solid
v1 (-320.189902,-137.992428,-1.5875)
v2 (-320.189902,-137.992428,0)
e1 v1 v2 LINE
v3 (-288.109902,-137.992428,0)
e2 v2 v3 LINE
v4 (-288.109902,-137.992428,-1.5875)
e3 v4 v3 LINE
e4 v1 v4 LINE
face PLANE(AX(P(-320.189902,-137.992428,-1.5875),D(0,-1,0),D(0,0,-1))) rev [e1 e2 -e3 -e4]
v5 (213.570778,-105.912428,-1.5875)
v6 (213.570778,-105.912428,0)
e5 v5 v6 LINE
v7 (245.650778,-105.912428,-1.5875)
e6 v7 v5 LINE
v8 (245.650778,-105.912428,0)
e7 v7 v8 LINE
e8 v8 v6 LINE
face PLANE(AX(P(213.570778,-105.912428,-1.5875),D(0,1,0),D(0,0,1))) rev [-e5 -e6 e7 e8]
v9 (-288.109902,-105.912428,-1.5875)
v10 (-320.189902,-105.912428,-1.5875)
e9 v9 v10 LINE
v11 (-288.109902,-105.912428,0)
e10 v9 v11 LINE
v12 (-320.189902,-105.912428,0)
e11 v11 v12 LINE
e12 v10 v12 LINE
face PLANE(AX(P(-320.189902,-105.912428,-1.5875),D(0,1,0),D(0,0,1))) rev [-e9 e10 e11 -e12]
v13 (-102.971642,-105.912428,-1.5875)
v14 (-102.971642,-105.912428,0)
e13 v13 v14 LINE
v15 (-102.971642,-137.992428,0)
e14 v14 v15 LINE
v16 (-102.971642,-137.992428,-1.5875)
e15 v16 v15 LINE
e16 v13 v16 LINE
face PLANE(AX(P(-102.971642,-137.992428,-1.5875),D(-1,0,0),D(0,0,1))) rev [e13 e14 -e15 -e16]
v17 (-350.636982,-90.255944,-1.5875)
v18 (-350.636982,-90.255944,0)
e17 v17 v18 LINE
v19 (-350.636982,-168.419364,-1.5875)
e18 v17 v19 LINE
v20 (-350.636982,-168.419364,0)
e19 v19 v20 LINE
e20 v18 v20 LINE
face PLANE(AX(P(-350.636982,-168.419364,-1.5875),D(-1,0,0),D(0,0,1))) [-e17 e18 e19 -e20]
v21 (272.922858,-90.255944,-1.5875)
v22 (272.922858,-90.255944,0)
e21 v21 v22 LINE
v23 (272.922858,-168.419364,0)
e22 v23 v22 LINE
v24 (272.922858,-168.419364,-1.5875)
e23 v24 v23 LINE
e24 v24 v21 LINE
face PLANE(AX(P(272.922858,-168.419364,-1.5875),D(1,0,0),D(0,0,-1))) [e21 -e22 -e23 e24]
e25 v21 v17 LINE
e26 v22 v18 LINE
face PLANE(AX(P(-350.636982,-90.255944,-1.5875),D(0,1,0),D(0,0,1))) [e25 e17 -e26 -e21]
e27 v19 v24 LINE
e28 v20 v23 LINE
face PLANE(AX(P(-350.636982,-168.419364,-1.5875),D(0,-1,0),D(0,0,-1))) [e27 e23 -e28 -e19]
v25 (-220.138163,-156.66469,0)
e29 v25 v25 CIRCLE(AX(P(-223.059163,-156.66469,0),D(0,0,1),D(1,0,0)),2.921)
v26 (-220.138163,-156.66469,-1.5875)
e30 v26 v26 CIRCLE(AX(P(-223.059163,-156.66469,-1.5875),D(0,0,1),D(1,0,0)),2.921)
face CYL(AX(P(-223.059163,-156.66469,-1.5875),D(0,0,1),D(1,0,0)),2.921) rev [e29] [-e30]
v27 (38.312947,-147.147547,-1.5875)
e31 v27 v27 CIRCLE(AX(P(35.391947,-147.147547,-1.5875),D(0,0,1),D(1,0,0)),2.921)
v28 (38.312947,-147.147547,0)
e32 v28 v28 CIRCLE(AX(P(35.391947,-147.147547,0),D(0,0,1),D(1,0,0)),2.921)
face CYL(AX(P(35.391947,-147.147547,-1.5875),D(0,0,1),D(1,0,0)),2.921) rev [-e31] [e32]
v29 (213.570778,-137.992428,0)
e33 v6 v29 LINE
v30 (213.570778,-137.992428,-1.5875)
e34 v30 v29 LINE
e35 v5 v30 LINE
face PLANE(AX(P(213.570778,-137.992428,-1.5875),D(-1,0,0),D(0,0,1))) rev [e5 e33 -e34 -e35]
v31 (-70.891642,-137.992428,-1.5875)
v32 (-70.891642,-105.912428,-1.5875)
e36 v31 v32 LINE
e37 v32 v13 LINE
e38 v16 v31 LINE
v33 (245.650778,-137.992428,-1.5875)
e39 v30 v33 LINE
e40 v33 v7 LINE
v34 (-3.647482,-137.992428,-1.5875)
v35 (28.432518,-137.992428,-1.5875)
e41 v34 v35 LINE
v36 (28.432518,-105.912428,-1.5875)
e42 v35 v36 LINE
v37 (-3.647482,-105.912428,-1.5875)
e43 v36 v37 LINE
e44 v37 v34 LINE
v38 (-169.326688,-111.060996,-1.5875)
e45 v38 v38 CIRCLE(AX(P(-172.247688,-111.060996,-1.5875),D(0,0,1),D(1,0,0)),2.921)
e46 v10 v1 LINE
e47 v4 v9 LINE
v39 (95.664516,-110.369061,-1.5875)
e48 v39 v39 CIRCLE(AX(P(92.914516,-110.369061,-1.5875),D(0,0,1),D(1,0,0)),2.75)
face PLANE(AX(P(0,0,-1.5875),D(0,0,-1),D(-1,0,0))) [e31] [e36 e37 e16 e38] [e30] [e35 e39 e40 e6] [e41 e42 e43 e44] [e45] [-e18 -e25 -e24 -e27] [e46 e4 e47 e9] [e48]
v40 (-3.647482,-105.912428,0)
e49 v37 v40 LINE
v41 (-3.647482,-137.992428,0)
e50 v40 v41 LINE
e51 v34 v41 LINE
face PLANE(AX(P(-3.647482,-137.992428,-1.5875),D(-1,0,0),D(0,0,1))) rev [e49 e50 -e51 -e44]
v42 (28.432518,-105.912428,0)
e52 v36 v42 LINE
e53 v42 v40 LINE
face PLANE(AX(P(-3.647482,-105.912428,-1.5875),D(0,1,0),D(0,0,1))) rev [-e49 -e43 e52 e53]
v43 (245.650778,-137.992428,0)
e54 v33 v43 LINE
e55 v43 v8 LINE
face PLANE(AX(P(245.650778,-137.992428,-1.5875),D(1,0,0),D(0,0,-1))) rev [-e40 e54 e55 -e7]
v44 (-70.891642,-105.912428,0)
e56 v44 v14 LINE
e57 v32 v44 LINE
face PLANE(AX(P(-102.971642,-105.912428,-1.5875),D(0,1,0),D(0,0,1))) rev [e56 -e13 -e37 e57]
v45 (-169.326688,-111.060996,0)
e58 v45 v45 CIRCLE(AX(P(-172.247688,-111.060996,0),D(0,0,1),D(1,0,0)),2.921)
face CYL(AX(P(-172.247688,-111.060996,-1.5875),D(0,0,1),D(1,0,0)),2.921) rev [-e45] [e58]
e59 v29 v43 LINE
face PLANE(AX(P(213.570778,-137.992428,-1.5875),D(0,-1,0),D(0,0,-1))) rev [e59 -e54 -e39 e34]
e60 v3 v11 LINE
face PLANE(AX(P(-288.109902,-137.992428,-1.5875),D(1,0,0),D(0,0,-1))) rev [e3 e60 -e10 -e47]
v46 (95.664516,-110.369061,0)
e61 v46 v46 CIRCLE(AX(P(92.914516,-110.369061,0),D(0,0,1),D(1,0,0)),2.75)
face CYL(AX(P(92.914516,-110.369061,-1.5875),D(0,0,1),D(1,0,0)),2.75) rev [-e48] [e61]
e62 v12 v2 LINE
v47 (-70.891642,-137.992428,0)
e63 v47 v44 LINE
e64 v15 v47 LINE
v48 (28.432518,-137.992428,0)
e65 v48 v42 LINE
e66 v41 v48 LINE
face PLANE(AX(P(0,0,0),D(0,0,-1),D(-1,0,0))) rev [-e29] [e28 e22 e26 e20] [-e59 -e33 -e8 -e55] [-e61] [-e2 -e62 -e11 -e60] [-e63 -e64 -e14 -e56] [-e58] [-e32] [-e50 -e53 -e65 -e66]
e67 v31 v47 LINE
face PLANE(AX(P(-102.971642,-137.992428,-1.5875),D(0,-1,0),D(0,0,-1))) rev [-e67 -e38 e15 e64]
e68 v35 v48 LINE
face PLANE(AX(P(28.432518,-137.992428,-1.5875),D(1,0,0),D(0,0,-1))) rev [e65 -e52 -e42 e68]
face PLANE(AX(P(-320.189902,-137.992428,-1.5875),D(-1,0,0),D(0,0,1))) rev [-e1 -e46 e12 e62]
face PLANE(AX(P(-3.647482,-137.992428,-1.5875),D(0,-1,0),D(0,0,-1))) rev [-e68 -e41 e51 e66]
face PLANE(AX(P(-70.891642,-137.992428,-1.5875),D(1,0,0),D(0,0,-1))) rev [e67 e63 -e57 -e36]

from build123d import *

# Parameters (mm, degrees)
SKETCH1_W          = 623.55984
SKETCH1_H          = 78.16342
BASE_FLANGE1_DEPTH = 1.5875
SKETCH3_R          = 2.75
SKETCH3_R_2        = 2.921
SKETCH3_W          = 32.08
SKETCH3_H          = 32.08
CUT_EXTRUDE3_DEPTH = 389.990867909


# Sheet-metal steps are written as plain solids
with BuildPart() as part:
    # Sketch1 → Base-Flange1 (new body)
    with BuildSketch(Plane.XY):
        with Locations((-38.857061865, -129.337653818)):
            Rectangle(SKETCH1_W, SKETCH1_H)
    extrude(amount=-BASE_FLANGE1_DEPTH)

    # Sketch3 → Cut-Extrude3 (cut, through all)
    with BuildSketch(Plane.XY):
        with Locations((92.914515529, -110.369060902)):
            Circle(SKETCH3_R)
        with Locations((35.391947046, -147.147547142)):
            Circle(SKETCH3_R_2)
        with Locations((-172.247688202, -111.060995593)):
            Circle(SKETCH3_R_2)
        with Locations((-223.059163384, -156.664689794)):
            Circle(SKETCH3_R_2)
        with Locations((-304.149901865, -121.952427932)):
            Rectangle(SKETCH3_W, SKETCH3_H)
        with Locations((-86.931641865, -121.952427932)):
            Rectangle(SKETCH3_W, SKETCH3_H)
        with Locations((12.392518135, -121.952427932)):
            Rectangle(SKETCH3_W, SKETCH3_H)
        with Locations((229.610778135, -121.952427932)):
            Rectangle(SKETCH3_W, SKETCH3_H)
    extrude(amount=-CUT_EXTRUDE3_DEPTH, mode=Mode.SUBTRACT)


solid = part.part
